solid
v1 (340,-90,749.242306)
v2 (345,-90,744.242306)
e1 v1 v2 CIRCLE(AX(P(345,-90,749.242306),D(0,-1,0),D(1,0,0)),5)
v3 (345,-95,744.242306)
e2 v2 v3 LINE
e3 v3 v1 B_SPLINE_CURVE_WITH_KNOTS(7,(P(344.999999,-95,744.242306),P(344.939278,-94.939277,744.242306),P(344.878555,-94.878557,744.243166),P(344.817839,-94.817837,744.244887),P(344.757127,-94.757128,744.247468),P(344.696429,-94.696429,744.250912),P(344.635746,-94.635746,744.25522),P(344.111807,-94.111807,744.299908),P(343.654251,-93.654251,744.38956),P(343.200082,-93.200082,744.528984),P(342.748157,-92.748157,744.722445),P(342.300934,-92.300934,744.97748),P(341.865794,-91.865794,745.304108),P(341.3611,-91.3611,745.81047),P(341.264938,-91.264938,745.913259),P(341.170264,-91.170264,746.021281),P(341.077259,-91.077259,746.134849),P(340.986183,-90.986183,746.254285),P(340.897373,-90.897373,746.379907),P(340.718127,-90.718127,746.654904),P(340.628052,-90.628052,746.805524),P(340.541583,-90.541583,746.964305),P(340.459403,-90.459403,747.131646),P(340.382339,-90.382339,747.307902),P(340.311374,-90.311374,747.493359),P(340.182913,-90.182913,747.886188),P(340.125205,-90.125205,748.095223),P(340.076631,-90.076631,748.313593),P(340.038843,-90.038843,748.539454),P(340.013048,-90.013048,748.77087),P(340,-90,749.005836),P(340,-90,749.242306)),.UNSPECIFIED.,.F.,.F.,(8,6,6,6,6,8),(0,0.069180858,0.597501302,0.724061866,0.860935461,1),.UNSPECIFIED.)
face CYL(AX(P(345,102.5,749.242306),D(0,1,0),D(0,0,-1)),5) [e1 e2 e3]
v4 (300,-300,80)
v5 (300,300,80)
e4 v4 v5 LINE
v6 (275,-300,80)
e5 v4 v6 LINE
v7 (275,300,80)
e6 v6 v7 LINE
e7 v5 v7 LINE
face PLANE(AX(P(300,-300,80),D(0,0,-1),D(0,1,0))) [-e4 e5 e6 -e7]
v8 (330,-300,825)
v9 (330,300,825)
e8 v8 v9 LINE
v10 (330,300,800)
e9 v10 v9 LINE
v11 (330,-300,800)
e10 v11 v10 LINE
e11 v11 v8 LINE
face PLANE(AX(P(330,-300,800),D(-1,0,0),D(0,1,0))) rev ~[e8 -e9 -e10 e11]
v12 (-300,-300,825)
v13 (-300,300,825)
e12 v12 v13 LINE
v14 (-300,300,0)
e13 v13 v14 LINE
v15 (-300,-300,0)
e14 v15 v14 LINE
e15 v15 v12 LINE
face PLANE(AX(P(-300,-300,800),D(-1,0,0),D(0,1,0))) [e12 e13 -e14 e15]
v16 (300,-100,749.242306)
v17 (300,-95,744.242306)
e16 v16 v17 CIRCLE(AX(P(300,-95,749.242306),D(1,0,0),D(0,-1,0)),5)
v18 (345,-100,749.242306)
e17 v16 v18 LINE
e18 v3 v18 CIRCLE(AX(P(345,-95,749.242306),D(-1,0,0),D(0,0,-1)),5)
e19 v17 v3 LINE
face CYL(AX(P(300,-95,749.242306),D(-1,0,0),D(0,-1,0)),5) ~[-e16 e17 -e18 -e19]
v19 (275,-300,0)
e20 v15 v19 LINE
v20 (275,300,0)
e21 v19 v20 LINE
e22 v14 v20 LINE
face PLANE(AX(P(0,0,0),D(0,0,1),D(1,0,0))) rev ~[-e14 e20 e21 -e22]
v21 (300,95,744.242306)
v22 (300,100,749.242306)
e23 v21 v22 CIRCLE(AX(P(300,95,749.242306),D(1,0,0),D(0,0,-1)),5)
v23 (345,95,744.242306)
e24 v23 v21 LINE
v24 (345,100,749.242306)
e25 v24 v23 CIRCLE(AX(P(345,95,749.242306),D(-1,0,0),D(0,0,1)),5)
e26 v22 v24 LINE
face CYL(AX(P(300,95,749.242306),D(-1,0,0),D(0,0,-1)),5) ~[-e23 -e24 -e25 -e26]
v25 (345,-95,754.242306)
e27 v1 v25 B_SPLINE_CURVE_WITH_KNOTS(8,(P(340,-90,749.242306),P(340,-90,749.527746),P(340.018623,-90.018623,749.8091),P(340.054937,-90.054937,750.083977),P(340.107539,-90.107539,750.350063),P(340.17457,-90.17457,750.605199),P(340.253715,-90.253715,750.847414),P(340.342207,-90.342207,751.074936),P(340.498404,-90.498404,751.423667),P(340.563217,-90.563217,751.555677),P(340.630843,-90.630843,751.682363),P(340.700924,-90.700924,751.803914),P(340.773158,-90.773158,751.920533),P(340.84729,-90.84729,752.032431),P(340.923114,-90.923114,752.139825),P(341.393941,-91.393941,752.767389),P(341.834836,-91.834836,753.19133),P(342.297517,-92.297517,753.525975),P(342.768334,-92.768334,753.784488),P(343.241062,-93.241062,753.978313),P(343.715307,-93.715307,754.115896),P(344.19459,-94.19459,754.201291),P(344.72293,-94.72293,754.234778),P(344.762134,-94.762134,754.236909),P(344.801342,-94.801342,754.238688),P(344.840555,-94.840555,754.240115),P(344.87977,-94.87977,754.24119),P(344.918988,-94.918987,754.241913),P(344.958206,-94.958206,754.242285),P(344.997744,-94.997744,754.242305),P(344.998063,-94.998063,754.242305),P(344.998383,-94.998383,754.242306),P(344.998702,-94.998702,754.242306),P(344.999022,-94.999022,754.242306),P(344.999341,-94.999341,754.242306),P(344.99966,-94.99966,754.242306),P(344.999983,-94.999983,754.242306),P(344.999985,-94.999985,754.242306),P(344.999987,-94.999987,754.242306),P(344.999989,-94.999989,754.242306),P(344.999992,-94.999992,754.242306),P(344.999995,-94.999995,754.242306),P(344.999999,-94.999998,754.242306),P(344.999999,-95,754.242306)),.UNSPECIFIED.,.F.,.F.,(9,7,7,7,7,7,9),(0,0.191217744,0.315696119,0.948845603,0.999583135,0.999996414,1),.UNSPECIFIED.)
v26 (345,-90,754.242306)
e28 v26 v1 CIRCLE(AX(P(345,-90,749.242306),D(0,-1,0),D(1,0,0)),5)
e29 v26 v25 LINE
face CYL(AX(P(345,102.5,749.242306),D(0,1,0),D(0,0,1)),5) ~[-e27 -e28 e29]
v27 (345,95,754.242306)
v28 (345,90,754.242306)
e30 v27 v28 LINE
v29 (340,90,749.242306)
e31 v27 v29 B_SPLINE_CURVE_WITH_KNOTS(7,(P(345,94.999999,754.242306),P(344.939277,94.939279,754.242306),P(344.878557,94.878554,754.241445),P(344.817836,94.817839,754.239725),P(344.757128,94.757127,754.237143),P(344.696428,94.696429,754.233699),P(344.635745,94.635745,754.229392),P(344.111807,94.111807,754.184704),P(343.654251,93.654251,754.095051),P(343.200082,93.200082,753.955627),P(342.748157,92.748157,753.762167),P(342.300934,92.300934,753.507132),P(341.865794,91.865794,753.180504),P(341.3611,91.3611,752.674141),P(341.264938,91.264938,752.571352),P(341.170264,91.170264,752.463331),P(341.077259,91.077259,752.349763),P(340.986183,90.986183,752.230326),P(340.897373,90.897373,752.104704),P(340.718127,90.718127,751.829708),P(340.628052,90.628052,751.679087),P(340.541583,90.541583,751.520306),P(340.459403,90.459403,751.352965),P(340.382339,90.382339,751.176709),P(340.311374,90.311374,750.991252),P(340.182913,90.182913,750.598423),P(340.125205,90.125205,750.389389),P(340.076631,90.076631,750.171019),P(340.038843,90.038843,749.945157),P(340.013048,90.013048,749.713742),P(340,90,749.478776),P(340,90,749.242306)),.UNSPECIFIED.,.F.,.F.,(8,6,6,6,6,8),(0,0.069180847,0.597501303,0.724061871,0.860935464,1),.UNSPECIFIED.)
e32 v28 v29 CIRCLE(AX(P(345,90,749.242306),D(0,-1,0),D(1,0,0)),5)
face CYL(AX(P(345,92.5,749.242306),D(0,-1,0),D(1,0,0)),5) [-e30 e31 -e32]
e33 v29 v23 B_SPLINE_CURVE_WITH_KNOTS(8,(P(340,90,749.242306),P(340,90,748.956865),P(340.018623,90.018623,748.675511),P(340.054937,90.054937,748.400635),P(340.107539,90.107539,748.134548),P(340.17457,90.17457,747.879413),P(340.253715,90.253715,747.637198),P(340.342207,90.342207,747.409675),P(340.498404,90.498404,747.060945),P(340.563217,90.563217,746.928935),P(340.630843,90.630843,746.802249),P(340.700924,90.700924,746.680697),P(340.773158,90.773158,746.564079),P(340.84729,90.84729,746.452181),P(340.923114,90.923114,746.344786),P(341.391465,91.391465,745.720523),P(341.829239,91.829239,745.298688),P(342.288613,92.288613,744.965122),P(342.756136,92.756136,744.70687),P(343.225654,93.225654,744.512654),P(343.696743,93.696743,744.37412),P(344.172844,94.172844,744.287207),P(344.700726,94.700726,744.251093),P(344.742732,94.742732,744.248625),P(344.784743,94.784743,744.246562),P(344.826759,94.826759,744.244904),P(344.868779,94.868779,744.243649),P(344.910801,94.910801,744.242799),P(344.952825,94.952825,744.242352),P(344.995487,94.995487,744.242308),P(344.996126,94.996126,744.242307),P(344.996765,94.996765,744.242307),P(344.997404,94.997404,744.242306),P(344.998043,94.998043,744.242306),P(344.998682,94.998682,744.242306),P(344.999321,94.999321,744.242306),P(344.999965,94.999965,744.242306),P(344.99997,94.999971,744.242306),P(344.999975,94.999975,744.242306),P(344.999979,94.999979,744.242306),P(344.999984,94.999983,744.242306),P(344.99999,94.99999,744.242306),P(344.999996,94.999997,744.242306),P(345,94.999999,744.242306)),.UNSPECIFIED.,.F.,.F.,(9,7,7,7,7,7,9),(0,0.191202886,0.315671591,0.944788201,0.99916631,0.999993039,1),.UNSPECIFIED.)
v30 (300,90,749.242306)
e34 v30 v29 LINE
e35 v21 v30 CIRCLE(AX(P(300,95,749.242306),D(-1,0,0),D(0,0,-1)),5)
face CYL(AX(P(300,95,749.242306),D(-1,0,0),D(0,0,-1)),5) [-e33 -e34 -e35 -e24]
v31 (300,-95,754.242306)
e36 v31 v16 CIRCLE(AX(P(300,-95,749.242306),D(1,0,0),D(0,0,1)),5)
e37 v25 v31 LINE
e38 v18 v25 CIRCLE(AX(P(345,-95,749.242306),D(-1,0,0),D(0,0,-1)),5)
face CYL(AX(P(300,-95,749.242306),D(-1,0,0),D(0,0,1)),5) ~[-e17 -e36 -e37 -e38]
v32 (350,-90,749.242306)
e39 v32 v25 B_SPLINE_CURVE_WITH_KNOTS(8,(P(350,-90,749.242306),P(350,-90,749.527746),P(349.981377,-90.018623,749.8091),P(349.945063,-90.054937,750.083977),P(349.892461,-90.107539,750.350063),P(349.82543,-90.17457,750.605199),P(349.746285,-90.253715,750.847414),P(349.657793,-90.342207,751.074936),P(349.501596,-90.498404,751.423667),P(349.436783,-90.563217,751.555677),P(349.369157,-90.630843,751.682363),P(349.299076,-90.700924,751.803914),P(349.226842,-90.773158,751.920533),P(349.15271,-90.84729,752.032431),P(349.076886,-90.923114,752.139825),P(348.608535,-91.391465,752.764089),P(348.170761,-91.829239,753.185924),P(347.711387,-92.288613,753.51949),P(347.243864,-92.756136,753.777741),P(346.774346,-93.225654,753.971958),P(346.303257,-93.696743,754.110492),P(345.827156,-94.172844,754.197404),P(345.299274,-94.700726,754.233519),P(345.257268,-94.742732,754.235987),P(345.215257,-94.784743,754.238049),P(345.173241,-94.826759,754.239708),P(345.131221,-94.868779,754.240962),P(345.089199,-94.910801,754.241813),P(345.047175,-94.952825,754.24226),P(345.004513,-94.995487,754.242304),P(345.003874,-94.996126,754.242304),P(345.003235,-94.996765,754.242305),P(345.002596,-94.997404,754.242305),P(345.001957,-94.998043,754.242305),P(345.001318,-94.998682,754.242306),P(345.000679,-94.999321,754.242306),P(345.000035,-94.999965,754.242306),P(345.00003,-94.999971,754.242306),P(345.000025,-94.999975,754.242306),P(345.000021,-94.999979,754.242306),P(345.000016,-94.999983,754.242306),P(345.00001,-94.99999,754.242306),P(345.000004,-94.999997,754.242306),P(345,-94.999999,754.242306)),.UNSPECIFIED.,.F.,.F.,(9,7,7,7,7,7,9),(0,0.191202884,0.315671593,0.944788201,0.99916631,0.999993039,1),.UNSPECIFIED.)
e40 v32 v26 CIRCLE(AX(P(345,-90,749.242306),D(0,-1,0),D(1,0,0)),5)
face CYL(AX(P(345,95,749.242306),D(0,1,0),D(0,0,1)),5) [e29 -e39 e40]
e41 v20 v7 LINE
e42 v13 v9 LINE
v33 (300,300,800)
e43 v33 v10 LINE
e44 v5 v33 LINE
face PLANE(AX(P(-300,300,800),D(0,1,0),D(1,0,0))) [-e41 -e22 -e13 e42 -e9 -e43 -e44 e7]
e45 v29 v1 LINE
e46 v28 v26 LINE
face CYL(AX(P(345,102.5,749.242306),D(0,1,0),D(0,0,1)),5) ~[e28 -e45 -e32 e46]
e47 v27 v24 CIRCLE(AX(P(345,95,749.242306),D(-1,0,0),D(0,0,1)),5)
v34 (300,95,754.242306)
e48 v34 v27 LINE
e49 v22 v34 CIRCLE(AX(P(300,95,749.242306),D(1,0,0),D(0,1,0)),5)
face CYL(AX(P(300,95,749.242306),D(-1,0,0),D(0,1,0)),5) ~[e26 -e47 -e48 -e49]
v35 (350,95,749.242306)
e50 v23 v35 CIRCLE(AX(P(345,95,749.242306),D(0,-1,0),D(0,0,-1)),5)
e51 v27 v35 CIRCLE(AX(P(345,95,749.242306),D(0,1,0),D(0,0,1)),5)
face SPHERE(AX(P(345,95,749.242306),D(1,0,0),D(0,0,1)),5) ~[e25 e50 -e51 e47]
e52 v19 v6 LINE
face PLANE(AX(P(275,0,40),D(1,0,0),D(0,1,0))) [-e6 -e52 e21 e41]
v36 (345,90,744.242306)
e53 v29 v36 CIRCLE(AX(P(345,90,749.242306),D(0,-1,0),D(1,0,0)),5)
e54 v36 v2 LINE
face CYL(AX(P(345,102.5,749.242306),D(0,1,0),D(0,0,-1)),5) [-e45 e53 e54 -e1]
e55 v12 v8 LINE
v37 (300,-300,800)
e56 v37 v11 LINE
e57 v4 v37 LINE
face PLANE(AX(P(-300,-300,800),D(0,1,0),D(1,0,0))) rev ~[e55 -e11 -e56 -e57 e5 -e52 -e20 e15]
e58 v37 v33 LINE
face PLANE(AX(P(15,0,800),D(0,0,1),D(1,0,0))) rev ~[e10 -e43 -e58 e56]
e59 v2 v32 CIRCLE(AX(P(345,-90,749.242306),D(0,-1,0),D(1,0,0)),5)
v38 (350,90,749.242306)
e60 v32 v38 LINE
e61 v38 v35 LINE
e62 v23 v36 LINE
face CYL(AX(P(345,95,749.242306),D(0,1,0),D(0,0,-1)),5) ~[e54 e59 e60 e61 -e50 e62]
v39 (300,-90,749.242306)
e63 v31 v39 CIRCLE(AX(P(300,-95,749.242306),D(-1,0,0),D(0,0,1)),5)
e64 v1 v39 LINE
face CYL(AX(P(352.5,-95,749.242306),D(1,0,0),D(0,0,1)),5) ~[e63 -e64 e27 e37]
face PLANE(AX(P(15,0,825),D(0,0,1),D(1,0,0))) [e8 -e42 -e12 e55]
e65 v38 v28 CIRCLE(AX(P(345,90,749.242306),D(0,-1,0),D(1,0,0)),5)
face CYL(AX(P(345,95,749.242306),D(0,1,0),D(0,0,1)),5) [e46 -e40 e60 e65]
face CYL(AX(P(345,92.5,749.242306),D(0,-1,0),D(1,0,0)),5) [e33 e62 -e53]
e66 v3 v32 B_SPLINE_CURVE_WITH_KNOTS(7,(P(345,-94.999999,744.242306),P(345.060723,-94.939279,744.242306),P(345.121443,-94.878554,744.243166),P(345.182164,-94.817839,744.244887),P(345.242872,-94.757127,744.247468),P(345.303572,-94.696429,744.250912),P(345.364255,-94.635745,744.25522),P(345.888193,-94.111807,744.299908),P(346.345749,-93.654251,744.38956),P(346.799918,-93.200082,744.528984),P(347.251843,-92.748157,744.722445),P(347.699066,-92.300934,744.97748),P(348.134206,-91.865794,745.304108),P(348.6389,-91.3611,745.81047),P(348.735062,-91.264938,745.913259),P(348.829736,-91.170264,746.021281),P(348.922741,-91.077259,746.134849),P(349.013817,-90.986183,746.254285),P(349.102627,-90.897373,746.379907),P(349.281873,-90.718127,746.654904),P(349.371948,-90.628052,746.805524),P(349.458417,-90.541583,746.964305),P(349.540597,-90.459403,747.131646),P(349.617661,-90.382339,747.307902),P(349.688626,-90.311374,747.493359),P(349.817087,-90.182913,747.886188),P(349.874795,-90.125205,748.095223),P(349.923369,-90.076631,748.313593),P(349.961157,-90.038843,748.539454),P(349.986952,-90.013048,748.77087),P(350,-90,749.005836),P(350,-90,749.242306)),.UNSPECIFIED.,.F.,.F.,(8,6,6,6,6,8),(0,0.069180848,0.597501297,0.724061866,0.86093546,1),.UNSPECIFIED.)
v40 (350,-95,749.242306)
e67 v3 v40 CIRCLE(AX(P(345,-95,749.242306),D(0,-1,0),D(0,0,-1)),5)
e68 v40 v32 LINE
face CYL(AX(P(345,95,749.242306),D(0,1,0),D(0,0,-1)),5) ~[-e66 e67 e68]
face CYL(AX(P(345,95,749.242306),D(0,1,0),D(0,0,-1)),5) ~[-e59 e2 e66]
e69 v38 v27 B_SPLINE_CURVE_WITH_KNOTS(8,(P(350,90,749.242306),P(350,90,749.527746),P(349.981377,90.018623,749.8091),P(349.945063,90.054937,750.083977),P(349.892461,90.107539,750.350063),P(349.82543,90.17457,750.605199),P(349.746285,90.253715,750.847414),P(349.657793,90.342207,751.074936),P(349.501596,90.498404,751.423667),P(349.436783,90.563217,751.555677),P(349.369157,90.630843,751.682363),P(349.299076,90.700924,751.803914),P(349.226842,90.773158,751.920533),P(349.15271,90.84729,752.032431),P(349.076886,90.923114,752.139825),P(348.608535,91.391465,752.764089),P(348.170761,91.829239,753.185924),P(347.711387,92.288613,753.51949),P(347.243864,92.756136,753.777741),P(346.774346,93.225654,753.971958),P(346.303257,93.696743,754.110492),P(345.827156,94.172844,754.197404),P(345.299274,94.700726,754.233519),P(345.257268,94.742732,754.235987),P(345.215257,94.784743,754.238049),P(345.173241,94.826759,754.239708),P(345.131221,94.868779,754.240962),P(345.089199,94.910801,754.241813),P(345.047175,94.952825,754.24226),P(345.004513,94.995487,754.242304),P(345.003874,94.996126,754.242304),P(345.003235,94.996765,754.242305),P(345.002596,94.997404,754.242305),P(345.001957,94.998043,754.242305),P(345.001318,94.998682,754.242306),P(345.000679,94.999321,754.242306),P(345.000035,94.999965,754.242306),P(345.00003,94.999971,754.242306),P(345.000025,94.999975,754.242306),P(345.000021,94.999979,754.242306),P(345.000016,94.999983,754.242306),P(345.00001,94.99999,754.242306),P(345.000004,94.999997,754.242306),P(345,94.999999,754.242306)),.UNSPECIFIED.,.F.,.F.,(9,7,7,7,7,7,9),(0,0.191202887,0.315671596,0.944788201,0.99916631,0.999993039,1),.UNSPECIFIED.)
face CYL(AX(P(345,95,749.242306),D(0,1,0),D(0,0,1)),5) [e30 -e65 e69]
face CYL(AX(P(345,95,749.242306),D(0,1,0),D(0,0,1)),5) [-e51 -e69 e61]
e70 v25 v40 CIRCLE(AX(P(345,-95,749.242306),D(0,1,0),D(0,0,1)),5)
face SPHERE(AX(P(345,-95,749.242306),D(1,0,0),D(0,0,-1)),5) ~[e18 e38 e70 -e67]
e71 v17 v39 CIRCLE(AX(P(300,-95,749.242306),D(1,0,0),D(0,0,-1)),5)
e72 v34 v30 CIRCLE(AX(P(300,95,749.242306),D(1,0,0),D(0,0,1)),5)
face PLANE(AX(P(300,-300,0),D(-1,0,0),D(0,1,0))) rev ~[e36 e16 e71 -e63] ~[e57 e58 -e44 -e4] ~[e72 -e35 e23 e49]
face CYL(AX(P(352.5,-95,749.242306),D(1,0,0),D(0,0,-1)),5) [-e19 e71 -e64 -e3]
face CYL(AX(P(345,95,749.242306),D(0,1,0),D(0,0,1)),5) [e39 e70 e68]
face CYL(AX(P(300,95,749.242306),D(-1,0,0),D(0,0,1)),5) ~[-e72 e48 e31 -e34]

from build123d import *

# Parameters (mm, degrees)
F0_W          = 600
F0_H          = 600
F1_DEPTH      = 800
F2_W          = 600
F2_H          = 80
F3_DEPTH      = 25
F4_W          = 630
F4_H          = 600
F5_DEPTH      = 25
F7_DEPTH      = 50
F8_W          = 40
F8_H          = 180
F9_DEPTH      = 25
F10_T1_DEPTH  = 190
F10_T4_ANGLE  = 180
F10_T8_DEPTH  = 52.5
F10_S9_R      = 5
F10_T10_DEPTH = 28
F10_T14_DEPTH = 205
F10_S15_R     = 5
F10_T16_DEPTH = 104
F10_S17_R     = 5
F10_T18_DEPTH = 104
F10_T22_DEPTH = 52.5
F10_S23_R     = 5
F10_T24_DEPTH = 28
F10_T28_DEPTH = 52.5
F10_S29_R     = 5
F10_T30_DEPTH = 28
F10_T34_DEPTH = 205
F10_S35_R     = 5
F10_T36_DEPTH = 104
F10_S37_R     = 5
F10_T38_DEPTH = 104
F10_T42_DEPTH = 52.5
F10_S43_R     = 5
F10_T44_DEPTH = 28
F10_T46_ANGLE = 180


# Not quite as in the source:
# - a fillet or chamfer that OpenCascade refuses, or shapes differently, is made with other operations: its cross-section is extruded or revolved along the edge and cut away or added


with BuildPart() as f1:
    # F0 (on Top) → F1 (new body)
    with BuildSketch(Plane.XY):
        Rectangle(F0_W, F0_H)
    extrude(amount=F1_DEPTH)

    # F2 (on face) → F3 (cut)
    with BuildSketch(Plane.YZ.offset(300)):
        with Locations((0, 40)):
            Rectangle(F2_W, F2_H)
    extrude(amount=-F3_DEPTH, mode=Mode.SUBTRACT)

    # F4 (on face) → F5 (join)
    with BuildSketch(Plane.XY.offset(800)):
        with Locations((15, 0)):
            Rectangle(F4_W, F4_H)
    extrude(amount=F5_DEPTH)

    # F6 (on face) → F7 (join)
    with BuildSketch(Plane.YZ.offset(300)):
        with BuildLine():
            ThreePointArc((100, 749.2423057556), (98.5355339059, 752.7778396615), (95, 754.2423057556))
            Line((95, 754.2423057556), (-95, 754.2423057556))
            ThreePointArc((-95, 754.2423057556), (-98.5355339059, 752.7778396615), (-100, 749.2423057556))
            ThreePointArc((-100, 749.2423057556), (-98.5355339059, 745.7067718497), (-95, 744.2423057556))
            Line((-95, 744.2423057556), (95, 744.2423057556))
            ThreePointArc((95, 744.2423057556), (98.5355339059, 745.7067718497), (100, 749.2423057556))
        make_face()
    extrude(amount=F7_DEPTH)

    # F8 (on face) → F9 (cut)
    with BuildSketch(Plane(origin=(0, 0, 744.2423057556), x_dir=(1, 0, 0), z_dir=(0, 0, -1))):
        with Locations((320, 0)):
            Rectangle(F8_W, F8_H)
    extrude(amount=-F9_DEPTH, mode=Mode.SUBTRACT)

    # F10: fillet of radius 5 on 10 edges, made by hand

    # F10_s2 → F10_t1 (cut)
    with BuildSketch(Plane.XZ.offset(-95)):
        with BuildLine():
            ThreePointArc((345, 754.2423057556), (348.5355339059, 752.7778396615), (350, 749.2423057556))
            Line((350, 749.2423057556), (350, 754.2423057556))
            Line((350, 754.2423057556), (345, 754.2423057556))
        make_face()
        with BuildLine():
            ThreePointArc((345, 744.2423057556), (348.5355339059, 745.7067718497), (350, 749.2423057556))
            Line((350, 749.2423057556), (350, 744.2423057556))
            Line((350, 744.2423057556), (345, 744.2423057556))
        make_face()
    extrude(amount=F10_T1_DEPTH, mode=Mode.SUBTRACT)

    # F10_s3 → F10_t4 (revolve, cut)
    with BuildSketch(Plane.XZ.offset(-95)):
        with BuildLine():
            ThreePointArc((345, 754.2423057556), (348.5355339059, 752.7778396615), (350, 749.2423057556))
            Line((350, 749.2423057556), (350, 754.2423057556))
            Line((350, 754.2423057556), (345, 754.2423057556))
        make_face()
    revolve(axis=Axis((350, 95, 749.2423057556), (-1, 0, 0)), revolution_arc=F10_T4_ANGLE, mode=Mode.SUBTRACT)


with BuildPart() as f10_tool6:
    # F10_s7 → F10_t8 (new body)
    with BuildSketch(Plane.YZ.offset(300)):
        with BuildLine():
            ThreePointArc((95, 744.2423057556), (91.4644660941, 745.7067718497), (90, 749.2423057556))
            Line((90, 749.2423057556), (90, 744.2423057556))
            Line((90, 744.2423057556), (95, 744.2423057556))
        make_face()
    extrude(amount=F10_T8_DEPTH)

    # F10_s9 → F10_t10 (cut, symmetric)
    with BuildSketch(Plane.XZ.offset(-92.5)):
        with Locations((345, 749.2423057556)):
            Circle(F10_S9_R)
    extrude(amount=F10_T10_DEPTH, both=True, mode=Mode.SUBTRACT)


with BuildPart() as f1_1:
    add(f1.part)

    # F10_t5: cut F10_tool6
    add(f10_tool6.part, mode=Mode.SUBTRACT)


with BuildPart() as f10_tool12:
    # F10_s13 → F10_t14 (new body)
    with BuildSketch(Plane.XZ.offset(-102.5)):
        with BuildLine():
            ThreePointArc((345, 744.2423057556), (341.4644660941, 745.7067718497), (340, 749.2423057556))
            Line((340, 749.2423057556), (340, 744.2423057556))
            Line((340, 744.2423057556), (345, 744.2423057556))
        make_face()
    extrude(amount=F10_T14_DEPTH)

    # F10_s15 → F10_t16 (cut, symmetric)
    with BuildSketch(Plane.YZ.offset(342.5)):
        with Locations((-95, 749.2423057556)):
            Circle(F10_S15_R)
    extrude(amount=F10_T16_DEPTH, both=True, mode=Mode.SUBTRACT)

    # F10_s17 → F10_t18 (cut, symmetric)
    with BuildSketch(Plane.YZ.offset(342.5)):
        with Locations((95, 749.2423057556)):
            Circle(F10_S17_R)
    extrude(amount=F10_T18_DEPTH, both=True, mode=Mode.SUBTRACT)


with BuildPart() as f1_2:
    add(f1_1.part)

    # F10_t11: cut F10_tool12
    add(f10_tool12.part, mode=Mode.SUBTRACT)


with BuildPart() as f10_tool20:
    # F10_s21 → F10_t22 (new body)
    with BuildSketch(Plane.YZ.offset(352.5)):
        with BuildLine():
            ThreePointArc((-95, 744.2423057556), (-91.4644660941, 745.7067718497), (-90, 749.2423057556))
            Line((-90, 749.2423057556), (-90, 744.2423057556))
            Line((-90, 744.2423057556), (-95, 744.2423057556))
        make_face()
    extrude(amount=-F10_T22_DEPTH)

    # F10_s23 → F10_t24 (cut, symmetric)
    with BuildSketch(Plane.XZ.offset(92.5)):
        with Locations((345, 749.2423057556)):
            Circle(F10_S23_R)
    extrude(amount=F10_T24_DEPTH, both=True, mode=Mode.SUBTRACT)


with BuildPart() as f1_3:
    add(f1_2.part)

    # F10_t19: cut F10_tool20
    add(f10_tool20.part, mode=Mode.SUBTRACT)


with BuildPart() as f10_tool26:
    # F10_s27 → F10_t28 (new body)
    with BuildSketch(Plane.YZ.offset(300)):
        with BuildLine():
            ThreePointArc((95, 754.2423057556), (91.4644660941, 752.7778396615), (90, 749.2423057556))
            Line((90, 749.2423057556), (90, 754.2423057556))
            Line((90, 754.2423057556), (95, 754.2423057556))
        make_face()
    extrude(amount=F10_T28_DEPTH)

    # F10_s29 → F10_t30 (cut, symmetric)
    with BuildSketch(Plane.XZ.offset(-92.5)):
        with Locations((345, 749.2423057556)):
            Circle(F10_S29_R)
    extrude(amount=F10_T30_DEPTH, both=True, mode=Mode.SUBTRACT)


with BuildPart() as f1_4:
    add(f1_3.part)

    # F10_t25: cut F10_tool26
    add(f10_tool26.part, mode=Mode.SUBTRACT)


with BuildPart() as f10_tool32:
    # F10_s33 → F10_t34 (new body)
    with BuildSketch(Plane.XZ.offset(-102.5)):
        with BuildLine():
            ThreePointArc((345, 754.2423057556), (341.4644660941, 752.7778396615), (340, 749.2423057556))
            Line((340, 749.2423057556), (340, 754.2423057556))
            Line((340, 754.2423057556), (345, 754.2423057556))
        make_face()
    extrude(amount=F10_T34_DEPTH)

    # F10_s35 → F10_t36 (cut, symmetric)
    with BuildSketch(Plane.YZ.offset(342.5)):
        with Locations((95, 749.2423057556)):
            Circle(F10_S35_R)
    extrude(amount=F10_T36_DEPTH, both=True, mode=Mode.SUBTRACT)

    # F10_s37 → F10_t38 (cut, symmetric)
    with BuildSketch(Plane.YZ.offset(342.5)):
        with Locations((-95, 749.2423057556)):
            Circle(F10_S37_R)
    extrude(amount=F10_T38_DEPTH, both=True, mode=Mode.SUBTRACT)


with BuildPart() as f1_5:
    add(f1_4.part)

    # F10_t31: cut F10_tool32
    add(f10_tool32.part, mode=Mode.SUBTRACT)


with BuildPart() as f10_tool40:
    # F10_s41 → F10_t42 (new body)
    with BuildSketch(Plane.YZ.offset(352.5)):
        with BuildLine():
            ThreePointArc((-95, 754.2423057556), (-91.4644660941, 752.7778396615), (-90, 749.2423057556))
            Line((-90, 749.2423057556), (-90, 754.2423057556))
            Line((-90, 754.2423057556), (-95, 754.2423057556))
        make_face()
    extrude(amount=-F10_T42_DEPTH)

    # F10_s43 → F10_t44 (cut, symmetric)
    with BuildSketch(Plane.XZ.offset(92.5)):
        with Locations((345, 749.2423057556)):
            Circle(F10_S43_R)
    extrude(amount=F10_T44_DEPTH, both=True, mode=Mode.SUBTRACT)


with BuildPart() as f1_6:
    add(f1_5.part)

    # F10_t39: cut F10_tool40
    add(f10_tool40.part, mode=Mode.SUBTRACT)

    # F10_s45 → F10_t46 (revolve, cut)
    with BuildSketch(Plane.XZ.offset(95)):
        with BuildLine():
            ThreePointArc((345, 744.2423057556), (348.5355339059, 745.7067718497), (350, 749.2423057556))
            Line((350, 749.2423057556), (350, 744.2423057556))
            Line((350, 744.2423057556), (345, 744.2423057556))
        make_face()
    revolve(axis=Axis((350, -95, 749.2423057556), (-1, 0, 0)), revolution_arc=F10_T46_ANGLE, mode=Mode.SUBTRACT)


solid = f1_6.part
